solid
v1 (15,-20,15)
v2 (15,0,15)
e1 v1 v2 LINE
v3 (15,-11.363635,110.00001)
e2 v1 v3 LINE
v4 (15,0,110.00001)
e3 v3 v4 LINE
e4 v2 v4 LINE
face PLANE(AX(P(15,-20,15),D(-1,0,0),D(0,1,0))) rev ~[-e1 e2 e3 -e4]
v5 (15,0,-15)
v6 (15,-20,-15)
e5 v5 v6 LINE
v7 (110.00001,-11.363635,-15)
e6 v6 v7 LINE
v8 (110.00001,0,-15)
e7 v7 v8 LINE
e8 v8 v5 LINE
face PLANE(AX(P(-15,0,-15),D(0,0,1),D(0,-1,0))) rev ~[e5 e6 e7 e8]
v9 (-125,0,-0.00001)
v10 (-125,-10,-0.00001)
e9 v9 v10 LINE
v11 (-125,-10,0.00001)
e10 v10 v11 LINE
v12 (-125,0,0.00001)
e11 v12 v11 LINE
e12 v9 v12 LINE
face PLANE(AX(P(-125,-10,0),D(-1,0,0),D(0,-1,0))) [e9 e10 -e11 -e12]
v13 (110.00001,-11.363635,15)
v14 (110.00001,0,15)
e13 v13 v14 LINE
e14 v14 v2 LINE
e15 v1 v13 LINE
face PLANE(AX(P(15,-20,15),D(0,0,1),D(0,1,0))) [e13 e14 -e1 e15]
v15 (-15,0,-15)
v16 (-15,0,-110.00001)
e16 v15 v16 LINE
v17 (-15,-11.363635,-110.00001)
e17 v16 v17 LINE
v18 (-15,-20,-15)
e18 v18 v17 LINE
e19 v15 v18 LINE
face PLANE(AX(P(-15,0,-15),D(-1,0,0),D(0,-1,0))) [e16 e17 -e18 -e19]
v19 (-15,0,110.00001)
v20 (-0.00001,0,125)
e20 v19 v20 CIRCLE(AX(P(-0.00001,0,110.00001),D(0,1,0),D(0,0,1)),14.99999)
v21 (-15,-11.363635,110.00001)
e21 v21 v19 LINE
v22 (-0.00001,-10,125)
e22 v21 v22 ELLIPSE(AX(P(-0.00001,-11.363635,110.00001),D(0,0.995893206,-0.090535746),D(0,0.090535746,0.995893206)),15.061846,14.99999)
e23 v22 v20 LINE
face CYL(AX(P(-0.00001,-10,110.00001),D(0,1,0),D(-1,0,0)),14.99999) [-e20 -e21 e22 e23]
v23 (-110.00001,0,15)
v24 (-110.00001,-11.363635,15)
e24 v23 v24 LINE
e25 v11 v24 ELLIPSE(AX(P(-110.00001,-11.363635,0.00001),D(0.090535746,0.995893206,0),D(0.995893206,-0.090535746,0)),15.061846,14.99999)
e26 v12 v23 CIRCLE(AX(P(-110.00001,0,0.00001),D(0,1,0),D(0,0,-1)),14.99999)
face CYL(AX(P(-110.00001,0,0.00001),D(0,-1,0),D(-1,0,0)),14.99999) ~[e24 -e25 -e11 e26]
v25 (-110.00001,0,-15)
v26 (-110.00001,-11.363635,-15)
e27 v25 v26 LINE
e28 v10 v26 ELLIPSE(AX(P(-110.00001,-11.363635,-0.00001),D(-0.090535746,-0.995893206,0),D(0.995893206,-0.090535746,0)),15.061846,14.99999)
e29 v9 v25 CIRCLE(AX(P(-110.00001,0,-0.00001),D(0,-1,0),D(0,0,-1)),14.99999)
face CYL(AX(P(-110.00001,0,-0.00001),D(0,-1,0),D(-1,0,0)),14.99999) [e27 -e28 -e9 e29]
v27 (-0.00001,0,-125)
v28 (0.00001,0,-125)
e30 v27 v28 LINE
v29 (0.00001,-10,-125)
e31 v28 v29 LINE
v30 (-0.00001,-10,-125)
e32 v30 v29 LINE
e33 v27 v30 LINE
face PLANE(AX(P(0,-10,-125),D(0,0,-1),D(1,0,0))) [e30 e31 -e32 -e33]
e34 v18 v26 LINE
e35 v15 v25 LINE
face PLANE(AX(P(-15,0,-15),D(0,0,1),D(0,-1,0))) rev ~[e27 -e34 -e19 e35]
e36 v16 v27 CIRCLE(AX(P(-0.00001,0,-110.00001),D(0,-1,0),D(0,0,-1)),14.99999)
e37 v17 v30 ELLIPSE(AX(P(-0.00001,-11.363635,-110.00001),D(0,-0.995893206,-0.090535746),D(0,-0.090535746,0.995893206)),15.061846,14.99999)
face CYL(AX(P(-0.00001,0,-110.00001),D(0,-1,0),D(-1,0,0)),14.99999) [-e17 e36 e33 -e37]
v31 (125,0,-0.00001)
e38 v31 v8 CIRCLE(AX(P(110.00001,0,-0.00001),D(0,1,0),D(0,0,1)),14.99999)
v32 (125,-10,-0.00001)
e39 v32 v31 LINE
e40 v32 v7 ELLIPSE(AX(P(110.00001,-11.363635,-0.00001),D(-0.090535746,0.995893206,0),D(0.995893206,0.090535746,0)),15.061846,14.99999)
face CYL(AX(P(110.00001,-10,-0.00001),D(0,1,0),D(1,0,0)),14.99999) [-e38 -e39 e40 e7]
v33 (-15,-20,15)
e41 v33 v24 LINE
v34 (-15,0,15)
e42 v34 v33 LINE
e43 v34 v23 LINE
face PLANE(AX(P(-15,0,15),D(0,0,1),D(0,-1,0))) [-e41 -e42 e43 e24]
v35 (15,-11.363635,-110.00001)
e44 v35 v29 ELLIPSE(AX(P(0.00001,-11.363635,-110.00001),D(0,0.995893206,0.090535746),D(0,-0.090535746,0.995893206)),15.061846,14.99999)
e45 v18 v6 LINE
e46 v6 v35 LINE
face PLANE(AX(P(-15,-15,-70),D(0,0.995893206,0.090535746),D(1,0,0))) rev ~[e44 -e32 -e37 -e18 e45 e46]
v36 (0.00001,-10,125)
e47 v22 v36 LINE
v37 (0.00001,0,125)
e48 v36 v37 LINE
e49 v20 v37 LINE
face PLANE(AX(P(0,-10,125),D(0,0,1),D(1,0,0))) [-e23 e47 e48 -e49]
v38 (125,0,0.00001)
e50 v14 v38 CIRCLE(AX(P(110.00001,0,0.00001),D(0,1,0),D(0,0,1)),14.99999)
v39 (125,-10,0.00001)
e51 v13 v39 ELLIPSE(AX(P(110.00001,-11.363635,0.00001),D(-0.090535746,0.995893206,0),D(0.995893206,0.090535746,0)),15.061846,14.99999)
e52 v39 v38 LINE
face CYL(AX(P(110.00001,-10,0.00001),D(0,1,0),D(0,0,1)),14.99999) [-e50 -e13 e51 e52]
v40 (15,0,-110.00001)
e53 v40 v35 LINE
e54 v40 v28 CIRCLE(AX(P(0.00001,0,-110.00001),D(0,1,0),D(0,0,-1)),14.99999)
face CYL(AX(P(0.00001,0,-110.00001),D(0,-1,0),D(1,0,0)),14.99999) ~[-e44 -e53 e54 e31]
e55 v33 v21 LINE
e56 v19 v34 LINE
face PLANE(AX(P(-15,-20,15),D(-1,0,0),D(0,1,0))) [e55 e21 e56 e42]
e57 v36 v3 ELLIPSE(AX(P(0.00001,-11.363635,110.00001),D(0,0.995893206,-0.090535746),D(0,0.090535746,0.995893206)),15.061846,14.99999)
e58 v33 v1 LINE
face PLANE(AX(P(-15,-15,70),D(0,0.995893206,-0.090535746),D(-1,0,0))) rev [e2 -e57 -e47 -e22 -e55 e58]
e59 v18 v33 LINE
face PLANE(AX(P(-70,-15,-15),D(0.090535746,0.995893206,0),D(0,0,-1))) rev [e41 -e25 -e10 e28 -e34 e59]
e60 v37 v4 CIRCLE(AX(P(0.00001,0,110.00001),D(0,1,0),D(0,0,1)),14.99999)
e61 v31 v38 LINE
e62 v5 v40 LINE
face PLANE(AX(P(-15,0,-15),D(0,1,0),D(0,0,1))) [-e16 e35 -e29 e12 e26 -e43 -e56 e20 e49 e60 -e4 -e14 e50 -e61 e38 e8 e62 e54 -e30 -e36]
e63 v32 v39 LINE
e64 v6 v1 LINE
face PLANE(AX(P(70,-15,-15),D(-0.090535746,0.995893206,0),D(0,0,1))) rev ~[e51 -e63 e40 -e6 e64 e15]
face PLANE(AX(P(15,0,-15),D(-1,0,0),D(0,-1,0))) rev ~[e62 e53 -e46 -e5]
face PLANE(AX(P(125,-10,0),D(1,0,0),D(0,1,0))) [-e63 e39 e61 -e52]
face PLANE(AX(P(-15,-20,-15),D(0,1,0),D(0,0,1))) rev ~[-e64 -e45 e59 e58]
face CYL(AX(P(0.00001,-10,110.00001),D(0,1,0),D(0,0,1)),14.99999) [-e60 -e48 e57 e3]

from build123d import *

# Parameters (mm, degrees)
F0_W      = 30
F0_H      = 30
F1_DEPTH  = 20
F5_W      = 20
F5_H      = 30
F6_DEPTH  = 110
F4_W      = 30
F4_H      = 20
F7_DEPTH  = 110
F3_W      = 20
F3_H      = 30
F8_DEPTH  = 110
F2_W      = 30
F2_H      = 20
F9_DEPTH  = 110
F10_SIZE2 = 10
F10_SIZE  = 110
F11_R     = 14.99999


# Not quite as in the source:
# - a fillet or chamfer is up to 0.001 mm smaller than in the source, because OpenCascade refuses the exact size


with BuildPart() as f1:
    # F0 (on Front) → F1 (new body)
    with BuildSketch(Plane.XZ):
        Rectangle(F0_W, F0_H)
    extrude(amount=F1_DEPTH)

    # F5 (on face) → F6 (join)
    with BuildSketch(Plane.YZ.offset(15)):
        with Locations((-10, 0)):
            Rectangle(F5_W, F5_H)
    extrude(amount=F6_DEPTH)

    # F4 (on face) → F7 (join)
    with BuildSketch(Plane.XY.offset(15)):
        with Locations((0, -10)):
            Rectangle(F4_W, F4_H)
    extrude(amount=F7_DEPTH)

    # F3 (on face) → F8 (join)
    with BuildSketch(Plane(origin=(-15, 0, 0), x_dir=(0, -1, 0), z_dir=(-1, 0, 0))):
        with Locations((10, 0)):
            Rectangle(F3_W, F3_H)
    extrude(amount=F8_DEPTH)

    # F2 (on face) → F9 (join)
    with BuildSketch(Plane(origin=(0, 0, -15), x_dir=(1, 0, 0), z_dir=(0, 0, -1))):
        with Locations((0, 10)):
            Rectangle(F2_W, F2_H)
    extrude(amount=F9_DEPTH)

    # F10
    f10_edges = [f1.edges().sort_by_distance(p)[0] for p in [
        (-125, -20, 0),
        (0, -20, -125),
        (125, -20, 0),
        (0, -20, 125),
    ]]
    f10_side = f1.faces().sort_by_distance((0, -20, 0))[0]
    chamfer(f10_edges, length=F10_SIZE, length2=F10_SIZE2, reference=f10_side)

    # F11 (radius 15 in the source; OpenCascade refuses exactly that, so slightly less here)
    f11_edges = [f1.edges().sort_by_distance(p)[0] for p in [
        (15, -5, 125),
        (-15, -5, 125),
        (-125, -5, 15),
        (-125, -5, -15),
        (-15, -5, -125),
        (15, -5, -125),
        (125, -5, -15),
        (125, -5, 15),
    ]]
    fillet(f11_edges, radius=F11_R)


solid = f1.part
